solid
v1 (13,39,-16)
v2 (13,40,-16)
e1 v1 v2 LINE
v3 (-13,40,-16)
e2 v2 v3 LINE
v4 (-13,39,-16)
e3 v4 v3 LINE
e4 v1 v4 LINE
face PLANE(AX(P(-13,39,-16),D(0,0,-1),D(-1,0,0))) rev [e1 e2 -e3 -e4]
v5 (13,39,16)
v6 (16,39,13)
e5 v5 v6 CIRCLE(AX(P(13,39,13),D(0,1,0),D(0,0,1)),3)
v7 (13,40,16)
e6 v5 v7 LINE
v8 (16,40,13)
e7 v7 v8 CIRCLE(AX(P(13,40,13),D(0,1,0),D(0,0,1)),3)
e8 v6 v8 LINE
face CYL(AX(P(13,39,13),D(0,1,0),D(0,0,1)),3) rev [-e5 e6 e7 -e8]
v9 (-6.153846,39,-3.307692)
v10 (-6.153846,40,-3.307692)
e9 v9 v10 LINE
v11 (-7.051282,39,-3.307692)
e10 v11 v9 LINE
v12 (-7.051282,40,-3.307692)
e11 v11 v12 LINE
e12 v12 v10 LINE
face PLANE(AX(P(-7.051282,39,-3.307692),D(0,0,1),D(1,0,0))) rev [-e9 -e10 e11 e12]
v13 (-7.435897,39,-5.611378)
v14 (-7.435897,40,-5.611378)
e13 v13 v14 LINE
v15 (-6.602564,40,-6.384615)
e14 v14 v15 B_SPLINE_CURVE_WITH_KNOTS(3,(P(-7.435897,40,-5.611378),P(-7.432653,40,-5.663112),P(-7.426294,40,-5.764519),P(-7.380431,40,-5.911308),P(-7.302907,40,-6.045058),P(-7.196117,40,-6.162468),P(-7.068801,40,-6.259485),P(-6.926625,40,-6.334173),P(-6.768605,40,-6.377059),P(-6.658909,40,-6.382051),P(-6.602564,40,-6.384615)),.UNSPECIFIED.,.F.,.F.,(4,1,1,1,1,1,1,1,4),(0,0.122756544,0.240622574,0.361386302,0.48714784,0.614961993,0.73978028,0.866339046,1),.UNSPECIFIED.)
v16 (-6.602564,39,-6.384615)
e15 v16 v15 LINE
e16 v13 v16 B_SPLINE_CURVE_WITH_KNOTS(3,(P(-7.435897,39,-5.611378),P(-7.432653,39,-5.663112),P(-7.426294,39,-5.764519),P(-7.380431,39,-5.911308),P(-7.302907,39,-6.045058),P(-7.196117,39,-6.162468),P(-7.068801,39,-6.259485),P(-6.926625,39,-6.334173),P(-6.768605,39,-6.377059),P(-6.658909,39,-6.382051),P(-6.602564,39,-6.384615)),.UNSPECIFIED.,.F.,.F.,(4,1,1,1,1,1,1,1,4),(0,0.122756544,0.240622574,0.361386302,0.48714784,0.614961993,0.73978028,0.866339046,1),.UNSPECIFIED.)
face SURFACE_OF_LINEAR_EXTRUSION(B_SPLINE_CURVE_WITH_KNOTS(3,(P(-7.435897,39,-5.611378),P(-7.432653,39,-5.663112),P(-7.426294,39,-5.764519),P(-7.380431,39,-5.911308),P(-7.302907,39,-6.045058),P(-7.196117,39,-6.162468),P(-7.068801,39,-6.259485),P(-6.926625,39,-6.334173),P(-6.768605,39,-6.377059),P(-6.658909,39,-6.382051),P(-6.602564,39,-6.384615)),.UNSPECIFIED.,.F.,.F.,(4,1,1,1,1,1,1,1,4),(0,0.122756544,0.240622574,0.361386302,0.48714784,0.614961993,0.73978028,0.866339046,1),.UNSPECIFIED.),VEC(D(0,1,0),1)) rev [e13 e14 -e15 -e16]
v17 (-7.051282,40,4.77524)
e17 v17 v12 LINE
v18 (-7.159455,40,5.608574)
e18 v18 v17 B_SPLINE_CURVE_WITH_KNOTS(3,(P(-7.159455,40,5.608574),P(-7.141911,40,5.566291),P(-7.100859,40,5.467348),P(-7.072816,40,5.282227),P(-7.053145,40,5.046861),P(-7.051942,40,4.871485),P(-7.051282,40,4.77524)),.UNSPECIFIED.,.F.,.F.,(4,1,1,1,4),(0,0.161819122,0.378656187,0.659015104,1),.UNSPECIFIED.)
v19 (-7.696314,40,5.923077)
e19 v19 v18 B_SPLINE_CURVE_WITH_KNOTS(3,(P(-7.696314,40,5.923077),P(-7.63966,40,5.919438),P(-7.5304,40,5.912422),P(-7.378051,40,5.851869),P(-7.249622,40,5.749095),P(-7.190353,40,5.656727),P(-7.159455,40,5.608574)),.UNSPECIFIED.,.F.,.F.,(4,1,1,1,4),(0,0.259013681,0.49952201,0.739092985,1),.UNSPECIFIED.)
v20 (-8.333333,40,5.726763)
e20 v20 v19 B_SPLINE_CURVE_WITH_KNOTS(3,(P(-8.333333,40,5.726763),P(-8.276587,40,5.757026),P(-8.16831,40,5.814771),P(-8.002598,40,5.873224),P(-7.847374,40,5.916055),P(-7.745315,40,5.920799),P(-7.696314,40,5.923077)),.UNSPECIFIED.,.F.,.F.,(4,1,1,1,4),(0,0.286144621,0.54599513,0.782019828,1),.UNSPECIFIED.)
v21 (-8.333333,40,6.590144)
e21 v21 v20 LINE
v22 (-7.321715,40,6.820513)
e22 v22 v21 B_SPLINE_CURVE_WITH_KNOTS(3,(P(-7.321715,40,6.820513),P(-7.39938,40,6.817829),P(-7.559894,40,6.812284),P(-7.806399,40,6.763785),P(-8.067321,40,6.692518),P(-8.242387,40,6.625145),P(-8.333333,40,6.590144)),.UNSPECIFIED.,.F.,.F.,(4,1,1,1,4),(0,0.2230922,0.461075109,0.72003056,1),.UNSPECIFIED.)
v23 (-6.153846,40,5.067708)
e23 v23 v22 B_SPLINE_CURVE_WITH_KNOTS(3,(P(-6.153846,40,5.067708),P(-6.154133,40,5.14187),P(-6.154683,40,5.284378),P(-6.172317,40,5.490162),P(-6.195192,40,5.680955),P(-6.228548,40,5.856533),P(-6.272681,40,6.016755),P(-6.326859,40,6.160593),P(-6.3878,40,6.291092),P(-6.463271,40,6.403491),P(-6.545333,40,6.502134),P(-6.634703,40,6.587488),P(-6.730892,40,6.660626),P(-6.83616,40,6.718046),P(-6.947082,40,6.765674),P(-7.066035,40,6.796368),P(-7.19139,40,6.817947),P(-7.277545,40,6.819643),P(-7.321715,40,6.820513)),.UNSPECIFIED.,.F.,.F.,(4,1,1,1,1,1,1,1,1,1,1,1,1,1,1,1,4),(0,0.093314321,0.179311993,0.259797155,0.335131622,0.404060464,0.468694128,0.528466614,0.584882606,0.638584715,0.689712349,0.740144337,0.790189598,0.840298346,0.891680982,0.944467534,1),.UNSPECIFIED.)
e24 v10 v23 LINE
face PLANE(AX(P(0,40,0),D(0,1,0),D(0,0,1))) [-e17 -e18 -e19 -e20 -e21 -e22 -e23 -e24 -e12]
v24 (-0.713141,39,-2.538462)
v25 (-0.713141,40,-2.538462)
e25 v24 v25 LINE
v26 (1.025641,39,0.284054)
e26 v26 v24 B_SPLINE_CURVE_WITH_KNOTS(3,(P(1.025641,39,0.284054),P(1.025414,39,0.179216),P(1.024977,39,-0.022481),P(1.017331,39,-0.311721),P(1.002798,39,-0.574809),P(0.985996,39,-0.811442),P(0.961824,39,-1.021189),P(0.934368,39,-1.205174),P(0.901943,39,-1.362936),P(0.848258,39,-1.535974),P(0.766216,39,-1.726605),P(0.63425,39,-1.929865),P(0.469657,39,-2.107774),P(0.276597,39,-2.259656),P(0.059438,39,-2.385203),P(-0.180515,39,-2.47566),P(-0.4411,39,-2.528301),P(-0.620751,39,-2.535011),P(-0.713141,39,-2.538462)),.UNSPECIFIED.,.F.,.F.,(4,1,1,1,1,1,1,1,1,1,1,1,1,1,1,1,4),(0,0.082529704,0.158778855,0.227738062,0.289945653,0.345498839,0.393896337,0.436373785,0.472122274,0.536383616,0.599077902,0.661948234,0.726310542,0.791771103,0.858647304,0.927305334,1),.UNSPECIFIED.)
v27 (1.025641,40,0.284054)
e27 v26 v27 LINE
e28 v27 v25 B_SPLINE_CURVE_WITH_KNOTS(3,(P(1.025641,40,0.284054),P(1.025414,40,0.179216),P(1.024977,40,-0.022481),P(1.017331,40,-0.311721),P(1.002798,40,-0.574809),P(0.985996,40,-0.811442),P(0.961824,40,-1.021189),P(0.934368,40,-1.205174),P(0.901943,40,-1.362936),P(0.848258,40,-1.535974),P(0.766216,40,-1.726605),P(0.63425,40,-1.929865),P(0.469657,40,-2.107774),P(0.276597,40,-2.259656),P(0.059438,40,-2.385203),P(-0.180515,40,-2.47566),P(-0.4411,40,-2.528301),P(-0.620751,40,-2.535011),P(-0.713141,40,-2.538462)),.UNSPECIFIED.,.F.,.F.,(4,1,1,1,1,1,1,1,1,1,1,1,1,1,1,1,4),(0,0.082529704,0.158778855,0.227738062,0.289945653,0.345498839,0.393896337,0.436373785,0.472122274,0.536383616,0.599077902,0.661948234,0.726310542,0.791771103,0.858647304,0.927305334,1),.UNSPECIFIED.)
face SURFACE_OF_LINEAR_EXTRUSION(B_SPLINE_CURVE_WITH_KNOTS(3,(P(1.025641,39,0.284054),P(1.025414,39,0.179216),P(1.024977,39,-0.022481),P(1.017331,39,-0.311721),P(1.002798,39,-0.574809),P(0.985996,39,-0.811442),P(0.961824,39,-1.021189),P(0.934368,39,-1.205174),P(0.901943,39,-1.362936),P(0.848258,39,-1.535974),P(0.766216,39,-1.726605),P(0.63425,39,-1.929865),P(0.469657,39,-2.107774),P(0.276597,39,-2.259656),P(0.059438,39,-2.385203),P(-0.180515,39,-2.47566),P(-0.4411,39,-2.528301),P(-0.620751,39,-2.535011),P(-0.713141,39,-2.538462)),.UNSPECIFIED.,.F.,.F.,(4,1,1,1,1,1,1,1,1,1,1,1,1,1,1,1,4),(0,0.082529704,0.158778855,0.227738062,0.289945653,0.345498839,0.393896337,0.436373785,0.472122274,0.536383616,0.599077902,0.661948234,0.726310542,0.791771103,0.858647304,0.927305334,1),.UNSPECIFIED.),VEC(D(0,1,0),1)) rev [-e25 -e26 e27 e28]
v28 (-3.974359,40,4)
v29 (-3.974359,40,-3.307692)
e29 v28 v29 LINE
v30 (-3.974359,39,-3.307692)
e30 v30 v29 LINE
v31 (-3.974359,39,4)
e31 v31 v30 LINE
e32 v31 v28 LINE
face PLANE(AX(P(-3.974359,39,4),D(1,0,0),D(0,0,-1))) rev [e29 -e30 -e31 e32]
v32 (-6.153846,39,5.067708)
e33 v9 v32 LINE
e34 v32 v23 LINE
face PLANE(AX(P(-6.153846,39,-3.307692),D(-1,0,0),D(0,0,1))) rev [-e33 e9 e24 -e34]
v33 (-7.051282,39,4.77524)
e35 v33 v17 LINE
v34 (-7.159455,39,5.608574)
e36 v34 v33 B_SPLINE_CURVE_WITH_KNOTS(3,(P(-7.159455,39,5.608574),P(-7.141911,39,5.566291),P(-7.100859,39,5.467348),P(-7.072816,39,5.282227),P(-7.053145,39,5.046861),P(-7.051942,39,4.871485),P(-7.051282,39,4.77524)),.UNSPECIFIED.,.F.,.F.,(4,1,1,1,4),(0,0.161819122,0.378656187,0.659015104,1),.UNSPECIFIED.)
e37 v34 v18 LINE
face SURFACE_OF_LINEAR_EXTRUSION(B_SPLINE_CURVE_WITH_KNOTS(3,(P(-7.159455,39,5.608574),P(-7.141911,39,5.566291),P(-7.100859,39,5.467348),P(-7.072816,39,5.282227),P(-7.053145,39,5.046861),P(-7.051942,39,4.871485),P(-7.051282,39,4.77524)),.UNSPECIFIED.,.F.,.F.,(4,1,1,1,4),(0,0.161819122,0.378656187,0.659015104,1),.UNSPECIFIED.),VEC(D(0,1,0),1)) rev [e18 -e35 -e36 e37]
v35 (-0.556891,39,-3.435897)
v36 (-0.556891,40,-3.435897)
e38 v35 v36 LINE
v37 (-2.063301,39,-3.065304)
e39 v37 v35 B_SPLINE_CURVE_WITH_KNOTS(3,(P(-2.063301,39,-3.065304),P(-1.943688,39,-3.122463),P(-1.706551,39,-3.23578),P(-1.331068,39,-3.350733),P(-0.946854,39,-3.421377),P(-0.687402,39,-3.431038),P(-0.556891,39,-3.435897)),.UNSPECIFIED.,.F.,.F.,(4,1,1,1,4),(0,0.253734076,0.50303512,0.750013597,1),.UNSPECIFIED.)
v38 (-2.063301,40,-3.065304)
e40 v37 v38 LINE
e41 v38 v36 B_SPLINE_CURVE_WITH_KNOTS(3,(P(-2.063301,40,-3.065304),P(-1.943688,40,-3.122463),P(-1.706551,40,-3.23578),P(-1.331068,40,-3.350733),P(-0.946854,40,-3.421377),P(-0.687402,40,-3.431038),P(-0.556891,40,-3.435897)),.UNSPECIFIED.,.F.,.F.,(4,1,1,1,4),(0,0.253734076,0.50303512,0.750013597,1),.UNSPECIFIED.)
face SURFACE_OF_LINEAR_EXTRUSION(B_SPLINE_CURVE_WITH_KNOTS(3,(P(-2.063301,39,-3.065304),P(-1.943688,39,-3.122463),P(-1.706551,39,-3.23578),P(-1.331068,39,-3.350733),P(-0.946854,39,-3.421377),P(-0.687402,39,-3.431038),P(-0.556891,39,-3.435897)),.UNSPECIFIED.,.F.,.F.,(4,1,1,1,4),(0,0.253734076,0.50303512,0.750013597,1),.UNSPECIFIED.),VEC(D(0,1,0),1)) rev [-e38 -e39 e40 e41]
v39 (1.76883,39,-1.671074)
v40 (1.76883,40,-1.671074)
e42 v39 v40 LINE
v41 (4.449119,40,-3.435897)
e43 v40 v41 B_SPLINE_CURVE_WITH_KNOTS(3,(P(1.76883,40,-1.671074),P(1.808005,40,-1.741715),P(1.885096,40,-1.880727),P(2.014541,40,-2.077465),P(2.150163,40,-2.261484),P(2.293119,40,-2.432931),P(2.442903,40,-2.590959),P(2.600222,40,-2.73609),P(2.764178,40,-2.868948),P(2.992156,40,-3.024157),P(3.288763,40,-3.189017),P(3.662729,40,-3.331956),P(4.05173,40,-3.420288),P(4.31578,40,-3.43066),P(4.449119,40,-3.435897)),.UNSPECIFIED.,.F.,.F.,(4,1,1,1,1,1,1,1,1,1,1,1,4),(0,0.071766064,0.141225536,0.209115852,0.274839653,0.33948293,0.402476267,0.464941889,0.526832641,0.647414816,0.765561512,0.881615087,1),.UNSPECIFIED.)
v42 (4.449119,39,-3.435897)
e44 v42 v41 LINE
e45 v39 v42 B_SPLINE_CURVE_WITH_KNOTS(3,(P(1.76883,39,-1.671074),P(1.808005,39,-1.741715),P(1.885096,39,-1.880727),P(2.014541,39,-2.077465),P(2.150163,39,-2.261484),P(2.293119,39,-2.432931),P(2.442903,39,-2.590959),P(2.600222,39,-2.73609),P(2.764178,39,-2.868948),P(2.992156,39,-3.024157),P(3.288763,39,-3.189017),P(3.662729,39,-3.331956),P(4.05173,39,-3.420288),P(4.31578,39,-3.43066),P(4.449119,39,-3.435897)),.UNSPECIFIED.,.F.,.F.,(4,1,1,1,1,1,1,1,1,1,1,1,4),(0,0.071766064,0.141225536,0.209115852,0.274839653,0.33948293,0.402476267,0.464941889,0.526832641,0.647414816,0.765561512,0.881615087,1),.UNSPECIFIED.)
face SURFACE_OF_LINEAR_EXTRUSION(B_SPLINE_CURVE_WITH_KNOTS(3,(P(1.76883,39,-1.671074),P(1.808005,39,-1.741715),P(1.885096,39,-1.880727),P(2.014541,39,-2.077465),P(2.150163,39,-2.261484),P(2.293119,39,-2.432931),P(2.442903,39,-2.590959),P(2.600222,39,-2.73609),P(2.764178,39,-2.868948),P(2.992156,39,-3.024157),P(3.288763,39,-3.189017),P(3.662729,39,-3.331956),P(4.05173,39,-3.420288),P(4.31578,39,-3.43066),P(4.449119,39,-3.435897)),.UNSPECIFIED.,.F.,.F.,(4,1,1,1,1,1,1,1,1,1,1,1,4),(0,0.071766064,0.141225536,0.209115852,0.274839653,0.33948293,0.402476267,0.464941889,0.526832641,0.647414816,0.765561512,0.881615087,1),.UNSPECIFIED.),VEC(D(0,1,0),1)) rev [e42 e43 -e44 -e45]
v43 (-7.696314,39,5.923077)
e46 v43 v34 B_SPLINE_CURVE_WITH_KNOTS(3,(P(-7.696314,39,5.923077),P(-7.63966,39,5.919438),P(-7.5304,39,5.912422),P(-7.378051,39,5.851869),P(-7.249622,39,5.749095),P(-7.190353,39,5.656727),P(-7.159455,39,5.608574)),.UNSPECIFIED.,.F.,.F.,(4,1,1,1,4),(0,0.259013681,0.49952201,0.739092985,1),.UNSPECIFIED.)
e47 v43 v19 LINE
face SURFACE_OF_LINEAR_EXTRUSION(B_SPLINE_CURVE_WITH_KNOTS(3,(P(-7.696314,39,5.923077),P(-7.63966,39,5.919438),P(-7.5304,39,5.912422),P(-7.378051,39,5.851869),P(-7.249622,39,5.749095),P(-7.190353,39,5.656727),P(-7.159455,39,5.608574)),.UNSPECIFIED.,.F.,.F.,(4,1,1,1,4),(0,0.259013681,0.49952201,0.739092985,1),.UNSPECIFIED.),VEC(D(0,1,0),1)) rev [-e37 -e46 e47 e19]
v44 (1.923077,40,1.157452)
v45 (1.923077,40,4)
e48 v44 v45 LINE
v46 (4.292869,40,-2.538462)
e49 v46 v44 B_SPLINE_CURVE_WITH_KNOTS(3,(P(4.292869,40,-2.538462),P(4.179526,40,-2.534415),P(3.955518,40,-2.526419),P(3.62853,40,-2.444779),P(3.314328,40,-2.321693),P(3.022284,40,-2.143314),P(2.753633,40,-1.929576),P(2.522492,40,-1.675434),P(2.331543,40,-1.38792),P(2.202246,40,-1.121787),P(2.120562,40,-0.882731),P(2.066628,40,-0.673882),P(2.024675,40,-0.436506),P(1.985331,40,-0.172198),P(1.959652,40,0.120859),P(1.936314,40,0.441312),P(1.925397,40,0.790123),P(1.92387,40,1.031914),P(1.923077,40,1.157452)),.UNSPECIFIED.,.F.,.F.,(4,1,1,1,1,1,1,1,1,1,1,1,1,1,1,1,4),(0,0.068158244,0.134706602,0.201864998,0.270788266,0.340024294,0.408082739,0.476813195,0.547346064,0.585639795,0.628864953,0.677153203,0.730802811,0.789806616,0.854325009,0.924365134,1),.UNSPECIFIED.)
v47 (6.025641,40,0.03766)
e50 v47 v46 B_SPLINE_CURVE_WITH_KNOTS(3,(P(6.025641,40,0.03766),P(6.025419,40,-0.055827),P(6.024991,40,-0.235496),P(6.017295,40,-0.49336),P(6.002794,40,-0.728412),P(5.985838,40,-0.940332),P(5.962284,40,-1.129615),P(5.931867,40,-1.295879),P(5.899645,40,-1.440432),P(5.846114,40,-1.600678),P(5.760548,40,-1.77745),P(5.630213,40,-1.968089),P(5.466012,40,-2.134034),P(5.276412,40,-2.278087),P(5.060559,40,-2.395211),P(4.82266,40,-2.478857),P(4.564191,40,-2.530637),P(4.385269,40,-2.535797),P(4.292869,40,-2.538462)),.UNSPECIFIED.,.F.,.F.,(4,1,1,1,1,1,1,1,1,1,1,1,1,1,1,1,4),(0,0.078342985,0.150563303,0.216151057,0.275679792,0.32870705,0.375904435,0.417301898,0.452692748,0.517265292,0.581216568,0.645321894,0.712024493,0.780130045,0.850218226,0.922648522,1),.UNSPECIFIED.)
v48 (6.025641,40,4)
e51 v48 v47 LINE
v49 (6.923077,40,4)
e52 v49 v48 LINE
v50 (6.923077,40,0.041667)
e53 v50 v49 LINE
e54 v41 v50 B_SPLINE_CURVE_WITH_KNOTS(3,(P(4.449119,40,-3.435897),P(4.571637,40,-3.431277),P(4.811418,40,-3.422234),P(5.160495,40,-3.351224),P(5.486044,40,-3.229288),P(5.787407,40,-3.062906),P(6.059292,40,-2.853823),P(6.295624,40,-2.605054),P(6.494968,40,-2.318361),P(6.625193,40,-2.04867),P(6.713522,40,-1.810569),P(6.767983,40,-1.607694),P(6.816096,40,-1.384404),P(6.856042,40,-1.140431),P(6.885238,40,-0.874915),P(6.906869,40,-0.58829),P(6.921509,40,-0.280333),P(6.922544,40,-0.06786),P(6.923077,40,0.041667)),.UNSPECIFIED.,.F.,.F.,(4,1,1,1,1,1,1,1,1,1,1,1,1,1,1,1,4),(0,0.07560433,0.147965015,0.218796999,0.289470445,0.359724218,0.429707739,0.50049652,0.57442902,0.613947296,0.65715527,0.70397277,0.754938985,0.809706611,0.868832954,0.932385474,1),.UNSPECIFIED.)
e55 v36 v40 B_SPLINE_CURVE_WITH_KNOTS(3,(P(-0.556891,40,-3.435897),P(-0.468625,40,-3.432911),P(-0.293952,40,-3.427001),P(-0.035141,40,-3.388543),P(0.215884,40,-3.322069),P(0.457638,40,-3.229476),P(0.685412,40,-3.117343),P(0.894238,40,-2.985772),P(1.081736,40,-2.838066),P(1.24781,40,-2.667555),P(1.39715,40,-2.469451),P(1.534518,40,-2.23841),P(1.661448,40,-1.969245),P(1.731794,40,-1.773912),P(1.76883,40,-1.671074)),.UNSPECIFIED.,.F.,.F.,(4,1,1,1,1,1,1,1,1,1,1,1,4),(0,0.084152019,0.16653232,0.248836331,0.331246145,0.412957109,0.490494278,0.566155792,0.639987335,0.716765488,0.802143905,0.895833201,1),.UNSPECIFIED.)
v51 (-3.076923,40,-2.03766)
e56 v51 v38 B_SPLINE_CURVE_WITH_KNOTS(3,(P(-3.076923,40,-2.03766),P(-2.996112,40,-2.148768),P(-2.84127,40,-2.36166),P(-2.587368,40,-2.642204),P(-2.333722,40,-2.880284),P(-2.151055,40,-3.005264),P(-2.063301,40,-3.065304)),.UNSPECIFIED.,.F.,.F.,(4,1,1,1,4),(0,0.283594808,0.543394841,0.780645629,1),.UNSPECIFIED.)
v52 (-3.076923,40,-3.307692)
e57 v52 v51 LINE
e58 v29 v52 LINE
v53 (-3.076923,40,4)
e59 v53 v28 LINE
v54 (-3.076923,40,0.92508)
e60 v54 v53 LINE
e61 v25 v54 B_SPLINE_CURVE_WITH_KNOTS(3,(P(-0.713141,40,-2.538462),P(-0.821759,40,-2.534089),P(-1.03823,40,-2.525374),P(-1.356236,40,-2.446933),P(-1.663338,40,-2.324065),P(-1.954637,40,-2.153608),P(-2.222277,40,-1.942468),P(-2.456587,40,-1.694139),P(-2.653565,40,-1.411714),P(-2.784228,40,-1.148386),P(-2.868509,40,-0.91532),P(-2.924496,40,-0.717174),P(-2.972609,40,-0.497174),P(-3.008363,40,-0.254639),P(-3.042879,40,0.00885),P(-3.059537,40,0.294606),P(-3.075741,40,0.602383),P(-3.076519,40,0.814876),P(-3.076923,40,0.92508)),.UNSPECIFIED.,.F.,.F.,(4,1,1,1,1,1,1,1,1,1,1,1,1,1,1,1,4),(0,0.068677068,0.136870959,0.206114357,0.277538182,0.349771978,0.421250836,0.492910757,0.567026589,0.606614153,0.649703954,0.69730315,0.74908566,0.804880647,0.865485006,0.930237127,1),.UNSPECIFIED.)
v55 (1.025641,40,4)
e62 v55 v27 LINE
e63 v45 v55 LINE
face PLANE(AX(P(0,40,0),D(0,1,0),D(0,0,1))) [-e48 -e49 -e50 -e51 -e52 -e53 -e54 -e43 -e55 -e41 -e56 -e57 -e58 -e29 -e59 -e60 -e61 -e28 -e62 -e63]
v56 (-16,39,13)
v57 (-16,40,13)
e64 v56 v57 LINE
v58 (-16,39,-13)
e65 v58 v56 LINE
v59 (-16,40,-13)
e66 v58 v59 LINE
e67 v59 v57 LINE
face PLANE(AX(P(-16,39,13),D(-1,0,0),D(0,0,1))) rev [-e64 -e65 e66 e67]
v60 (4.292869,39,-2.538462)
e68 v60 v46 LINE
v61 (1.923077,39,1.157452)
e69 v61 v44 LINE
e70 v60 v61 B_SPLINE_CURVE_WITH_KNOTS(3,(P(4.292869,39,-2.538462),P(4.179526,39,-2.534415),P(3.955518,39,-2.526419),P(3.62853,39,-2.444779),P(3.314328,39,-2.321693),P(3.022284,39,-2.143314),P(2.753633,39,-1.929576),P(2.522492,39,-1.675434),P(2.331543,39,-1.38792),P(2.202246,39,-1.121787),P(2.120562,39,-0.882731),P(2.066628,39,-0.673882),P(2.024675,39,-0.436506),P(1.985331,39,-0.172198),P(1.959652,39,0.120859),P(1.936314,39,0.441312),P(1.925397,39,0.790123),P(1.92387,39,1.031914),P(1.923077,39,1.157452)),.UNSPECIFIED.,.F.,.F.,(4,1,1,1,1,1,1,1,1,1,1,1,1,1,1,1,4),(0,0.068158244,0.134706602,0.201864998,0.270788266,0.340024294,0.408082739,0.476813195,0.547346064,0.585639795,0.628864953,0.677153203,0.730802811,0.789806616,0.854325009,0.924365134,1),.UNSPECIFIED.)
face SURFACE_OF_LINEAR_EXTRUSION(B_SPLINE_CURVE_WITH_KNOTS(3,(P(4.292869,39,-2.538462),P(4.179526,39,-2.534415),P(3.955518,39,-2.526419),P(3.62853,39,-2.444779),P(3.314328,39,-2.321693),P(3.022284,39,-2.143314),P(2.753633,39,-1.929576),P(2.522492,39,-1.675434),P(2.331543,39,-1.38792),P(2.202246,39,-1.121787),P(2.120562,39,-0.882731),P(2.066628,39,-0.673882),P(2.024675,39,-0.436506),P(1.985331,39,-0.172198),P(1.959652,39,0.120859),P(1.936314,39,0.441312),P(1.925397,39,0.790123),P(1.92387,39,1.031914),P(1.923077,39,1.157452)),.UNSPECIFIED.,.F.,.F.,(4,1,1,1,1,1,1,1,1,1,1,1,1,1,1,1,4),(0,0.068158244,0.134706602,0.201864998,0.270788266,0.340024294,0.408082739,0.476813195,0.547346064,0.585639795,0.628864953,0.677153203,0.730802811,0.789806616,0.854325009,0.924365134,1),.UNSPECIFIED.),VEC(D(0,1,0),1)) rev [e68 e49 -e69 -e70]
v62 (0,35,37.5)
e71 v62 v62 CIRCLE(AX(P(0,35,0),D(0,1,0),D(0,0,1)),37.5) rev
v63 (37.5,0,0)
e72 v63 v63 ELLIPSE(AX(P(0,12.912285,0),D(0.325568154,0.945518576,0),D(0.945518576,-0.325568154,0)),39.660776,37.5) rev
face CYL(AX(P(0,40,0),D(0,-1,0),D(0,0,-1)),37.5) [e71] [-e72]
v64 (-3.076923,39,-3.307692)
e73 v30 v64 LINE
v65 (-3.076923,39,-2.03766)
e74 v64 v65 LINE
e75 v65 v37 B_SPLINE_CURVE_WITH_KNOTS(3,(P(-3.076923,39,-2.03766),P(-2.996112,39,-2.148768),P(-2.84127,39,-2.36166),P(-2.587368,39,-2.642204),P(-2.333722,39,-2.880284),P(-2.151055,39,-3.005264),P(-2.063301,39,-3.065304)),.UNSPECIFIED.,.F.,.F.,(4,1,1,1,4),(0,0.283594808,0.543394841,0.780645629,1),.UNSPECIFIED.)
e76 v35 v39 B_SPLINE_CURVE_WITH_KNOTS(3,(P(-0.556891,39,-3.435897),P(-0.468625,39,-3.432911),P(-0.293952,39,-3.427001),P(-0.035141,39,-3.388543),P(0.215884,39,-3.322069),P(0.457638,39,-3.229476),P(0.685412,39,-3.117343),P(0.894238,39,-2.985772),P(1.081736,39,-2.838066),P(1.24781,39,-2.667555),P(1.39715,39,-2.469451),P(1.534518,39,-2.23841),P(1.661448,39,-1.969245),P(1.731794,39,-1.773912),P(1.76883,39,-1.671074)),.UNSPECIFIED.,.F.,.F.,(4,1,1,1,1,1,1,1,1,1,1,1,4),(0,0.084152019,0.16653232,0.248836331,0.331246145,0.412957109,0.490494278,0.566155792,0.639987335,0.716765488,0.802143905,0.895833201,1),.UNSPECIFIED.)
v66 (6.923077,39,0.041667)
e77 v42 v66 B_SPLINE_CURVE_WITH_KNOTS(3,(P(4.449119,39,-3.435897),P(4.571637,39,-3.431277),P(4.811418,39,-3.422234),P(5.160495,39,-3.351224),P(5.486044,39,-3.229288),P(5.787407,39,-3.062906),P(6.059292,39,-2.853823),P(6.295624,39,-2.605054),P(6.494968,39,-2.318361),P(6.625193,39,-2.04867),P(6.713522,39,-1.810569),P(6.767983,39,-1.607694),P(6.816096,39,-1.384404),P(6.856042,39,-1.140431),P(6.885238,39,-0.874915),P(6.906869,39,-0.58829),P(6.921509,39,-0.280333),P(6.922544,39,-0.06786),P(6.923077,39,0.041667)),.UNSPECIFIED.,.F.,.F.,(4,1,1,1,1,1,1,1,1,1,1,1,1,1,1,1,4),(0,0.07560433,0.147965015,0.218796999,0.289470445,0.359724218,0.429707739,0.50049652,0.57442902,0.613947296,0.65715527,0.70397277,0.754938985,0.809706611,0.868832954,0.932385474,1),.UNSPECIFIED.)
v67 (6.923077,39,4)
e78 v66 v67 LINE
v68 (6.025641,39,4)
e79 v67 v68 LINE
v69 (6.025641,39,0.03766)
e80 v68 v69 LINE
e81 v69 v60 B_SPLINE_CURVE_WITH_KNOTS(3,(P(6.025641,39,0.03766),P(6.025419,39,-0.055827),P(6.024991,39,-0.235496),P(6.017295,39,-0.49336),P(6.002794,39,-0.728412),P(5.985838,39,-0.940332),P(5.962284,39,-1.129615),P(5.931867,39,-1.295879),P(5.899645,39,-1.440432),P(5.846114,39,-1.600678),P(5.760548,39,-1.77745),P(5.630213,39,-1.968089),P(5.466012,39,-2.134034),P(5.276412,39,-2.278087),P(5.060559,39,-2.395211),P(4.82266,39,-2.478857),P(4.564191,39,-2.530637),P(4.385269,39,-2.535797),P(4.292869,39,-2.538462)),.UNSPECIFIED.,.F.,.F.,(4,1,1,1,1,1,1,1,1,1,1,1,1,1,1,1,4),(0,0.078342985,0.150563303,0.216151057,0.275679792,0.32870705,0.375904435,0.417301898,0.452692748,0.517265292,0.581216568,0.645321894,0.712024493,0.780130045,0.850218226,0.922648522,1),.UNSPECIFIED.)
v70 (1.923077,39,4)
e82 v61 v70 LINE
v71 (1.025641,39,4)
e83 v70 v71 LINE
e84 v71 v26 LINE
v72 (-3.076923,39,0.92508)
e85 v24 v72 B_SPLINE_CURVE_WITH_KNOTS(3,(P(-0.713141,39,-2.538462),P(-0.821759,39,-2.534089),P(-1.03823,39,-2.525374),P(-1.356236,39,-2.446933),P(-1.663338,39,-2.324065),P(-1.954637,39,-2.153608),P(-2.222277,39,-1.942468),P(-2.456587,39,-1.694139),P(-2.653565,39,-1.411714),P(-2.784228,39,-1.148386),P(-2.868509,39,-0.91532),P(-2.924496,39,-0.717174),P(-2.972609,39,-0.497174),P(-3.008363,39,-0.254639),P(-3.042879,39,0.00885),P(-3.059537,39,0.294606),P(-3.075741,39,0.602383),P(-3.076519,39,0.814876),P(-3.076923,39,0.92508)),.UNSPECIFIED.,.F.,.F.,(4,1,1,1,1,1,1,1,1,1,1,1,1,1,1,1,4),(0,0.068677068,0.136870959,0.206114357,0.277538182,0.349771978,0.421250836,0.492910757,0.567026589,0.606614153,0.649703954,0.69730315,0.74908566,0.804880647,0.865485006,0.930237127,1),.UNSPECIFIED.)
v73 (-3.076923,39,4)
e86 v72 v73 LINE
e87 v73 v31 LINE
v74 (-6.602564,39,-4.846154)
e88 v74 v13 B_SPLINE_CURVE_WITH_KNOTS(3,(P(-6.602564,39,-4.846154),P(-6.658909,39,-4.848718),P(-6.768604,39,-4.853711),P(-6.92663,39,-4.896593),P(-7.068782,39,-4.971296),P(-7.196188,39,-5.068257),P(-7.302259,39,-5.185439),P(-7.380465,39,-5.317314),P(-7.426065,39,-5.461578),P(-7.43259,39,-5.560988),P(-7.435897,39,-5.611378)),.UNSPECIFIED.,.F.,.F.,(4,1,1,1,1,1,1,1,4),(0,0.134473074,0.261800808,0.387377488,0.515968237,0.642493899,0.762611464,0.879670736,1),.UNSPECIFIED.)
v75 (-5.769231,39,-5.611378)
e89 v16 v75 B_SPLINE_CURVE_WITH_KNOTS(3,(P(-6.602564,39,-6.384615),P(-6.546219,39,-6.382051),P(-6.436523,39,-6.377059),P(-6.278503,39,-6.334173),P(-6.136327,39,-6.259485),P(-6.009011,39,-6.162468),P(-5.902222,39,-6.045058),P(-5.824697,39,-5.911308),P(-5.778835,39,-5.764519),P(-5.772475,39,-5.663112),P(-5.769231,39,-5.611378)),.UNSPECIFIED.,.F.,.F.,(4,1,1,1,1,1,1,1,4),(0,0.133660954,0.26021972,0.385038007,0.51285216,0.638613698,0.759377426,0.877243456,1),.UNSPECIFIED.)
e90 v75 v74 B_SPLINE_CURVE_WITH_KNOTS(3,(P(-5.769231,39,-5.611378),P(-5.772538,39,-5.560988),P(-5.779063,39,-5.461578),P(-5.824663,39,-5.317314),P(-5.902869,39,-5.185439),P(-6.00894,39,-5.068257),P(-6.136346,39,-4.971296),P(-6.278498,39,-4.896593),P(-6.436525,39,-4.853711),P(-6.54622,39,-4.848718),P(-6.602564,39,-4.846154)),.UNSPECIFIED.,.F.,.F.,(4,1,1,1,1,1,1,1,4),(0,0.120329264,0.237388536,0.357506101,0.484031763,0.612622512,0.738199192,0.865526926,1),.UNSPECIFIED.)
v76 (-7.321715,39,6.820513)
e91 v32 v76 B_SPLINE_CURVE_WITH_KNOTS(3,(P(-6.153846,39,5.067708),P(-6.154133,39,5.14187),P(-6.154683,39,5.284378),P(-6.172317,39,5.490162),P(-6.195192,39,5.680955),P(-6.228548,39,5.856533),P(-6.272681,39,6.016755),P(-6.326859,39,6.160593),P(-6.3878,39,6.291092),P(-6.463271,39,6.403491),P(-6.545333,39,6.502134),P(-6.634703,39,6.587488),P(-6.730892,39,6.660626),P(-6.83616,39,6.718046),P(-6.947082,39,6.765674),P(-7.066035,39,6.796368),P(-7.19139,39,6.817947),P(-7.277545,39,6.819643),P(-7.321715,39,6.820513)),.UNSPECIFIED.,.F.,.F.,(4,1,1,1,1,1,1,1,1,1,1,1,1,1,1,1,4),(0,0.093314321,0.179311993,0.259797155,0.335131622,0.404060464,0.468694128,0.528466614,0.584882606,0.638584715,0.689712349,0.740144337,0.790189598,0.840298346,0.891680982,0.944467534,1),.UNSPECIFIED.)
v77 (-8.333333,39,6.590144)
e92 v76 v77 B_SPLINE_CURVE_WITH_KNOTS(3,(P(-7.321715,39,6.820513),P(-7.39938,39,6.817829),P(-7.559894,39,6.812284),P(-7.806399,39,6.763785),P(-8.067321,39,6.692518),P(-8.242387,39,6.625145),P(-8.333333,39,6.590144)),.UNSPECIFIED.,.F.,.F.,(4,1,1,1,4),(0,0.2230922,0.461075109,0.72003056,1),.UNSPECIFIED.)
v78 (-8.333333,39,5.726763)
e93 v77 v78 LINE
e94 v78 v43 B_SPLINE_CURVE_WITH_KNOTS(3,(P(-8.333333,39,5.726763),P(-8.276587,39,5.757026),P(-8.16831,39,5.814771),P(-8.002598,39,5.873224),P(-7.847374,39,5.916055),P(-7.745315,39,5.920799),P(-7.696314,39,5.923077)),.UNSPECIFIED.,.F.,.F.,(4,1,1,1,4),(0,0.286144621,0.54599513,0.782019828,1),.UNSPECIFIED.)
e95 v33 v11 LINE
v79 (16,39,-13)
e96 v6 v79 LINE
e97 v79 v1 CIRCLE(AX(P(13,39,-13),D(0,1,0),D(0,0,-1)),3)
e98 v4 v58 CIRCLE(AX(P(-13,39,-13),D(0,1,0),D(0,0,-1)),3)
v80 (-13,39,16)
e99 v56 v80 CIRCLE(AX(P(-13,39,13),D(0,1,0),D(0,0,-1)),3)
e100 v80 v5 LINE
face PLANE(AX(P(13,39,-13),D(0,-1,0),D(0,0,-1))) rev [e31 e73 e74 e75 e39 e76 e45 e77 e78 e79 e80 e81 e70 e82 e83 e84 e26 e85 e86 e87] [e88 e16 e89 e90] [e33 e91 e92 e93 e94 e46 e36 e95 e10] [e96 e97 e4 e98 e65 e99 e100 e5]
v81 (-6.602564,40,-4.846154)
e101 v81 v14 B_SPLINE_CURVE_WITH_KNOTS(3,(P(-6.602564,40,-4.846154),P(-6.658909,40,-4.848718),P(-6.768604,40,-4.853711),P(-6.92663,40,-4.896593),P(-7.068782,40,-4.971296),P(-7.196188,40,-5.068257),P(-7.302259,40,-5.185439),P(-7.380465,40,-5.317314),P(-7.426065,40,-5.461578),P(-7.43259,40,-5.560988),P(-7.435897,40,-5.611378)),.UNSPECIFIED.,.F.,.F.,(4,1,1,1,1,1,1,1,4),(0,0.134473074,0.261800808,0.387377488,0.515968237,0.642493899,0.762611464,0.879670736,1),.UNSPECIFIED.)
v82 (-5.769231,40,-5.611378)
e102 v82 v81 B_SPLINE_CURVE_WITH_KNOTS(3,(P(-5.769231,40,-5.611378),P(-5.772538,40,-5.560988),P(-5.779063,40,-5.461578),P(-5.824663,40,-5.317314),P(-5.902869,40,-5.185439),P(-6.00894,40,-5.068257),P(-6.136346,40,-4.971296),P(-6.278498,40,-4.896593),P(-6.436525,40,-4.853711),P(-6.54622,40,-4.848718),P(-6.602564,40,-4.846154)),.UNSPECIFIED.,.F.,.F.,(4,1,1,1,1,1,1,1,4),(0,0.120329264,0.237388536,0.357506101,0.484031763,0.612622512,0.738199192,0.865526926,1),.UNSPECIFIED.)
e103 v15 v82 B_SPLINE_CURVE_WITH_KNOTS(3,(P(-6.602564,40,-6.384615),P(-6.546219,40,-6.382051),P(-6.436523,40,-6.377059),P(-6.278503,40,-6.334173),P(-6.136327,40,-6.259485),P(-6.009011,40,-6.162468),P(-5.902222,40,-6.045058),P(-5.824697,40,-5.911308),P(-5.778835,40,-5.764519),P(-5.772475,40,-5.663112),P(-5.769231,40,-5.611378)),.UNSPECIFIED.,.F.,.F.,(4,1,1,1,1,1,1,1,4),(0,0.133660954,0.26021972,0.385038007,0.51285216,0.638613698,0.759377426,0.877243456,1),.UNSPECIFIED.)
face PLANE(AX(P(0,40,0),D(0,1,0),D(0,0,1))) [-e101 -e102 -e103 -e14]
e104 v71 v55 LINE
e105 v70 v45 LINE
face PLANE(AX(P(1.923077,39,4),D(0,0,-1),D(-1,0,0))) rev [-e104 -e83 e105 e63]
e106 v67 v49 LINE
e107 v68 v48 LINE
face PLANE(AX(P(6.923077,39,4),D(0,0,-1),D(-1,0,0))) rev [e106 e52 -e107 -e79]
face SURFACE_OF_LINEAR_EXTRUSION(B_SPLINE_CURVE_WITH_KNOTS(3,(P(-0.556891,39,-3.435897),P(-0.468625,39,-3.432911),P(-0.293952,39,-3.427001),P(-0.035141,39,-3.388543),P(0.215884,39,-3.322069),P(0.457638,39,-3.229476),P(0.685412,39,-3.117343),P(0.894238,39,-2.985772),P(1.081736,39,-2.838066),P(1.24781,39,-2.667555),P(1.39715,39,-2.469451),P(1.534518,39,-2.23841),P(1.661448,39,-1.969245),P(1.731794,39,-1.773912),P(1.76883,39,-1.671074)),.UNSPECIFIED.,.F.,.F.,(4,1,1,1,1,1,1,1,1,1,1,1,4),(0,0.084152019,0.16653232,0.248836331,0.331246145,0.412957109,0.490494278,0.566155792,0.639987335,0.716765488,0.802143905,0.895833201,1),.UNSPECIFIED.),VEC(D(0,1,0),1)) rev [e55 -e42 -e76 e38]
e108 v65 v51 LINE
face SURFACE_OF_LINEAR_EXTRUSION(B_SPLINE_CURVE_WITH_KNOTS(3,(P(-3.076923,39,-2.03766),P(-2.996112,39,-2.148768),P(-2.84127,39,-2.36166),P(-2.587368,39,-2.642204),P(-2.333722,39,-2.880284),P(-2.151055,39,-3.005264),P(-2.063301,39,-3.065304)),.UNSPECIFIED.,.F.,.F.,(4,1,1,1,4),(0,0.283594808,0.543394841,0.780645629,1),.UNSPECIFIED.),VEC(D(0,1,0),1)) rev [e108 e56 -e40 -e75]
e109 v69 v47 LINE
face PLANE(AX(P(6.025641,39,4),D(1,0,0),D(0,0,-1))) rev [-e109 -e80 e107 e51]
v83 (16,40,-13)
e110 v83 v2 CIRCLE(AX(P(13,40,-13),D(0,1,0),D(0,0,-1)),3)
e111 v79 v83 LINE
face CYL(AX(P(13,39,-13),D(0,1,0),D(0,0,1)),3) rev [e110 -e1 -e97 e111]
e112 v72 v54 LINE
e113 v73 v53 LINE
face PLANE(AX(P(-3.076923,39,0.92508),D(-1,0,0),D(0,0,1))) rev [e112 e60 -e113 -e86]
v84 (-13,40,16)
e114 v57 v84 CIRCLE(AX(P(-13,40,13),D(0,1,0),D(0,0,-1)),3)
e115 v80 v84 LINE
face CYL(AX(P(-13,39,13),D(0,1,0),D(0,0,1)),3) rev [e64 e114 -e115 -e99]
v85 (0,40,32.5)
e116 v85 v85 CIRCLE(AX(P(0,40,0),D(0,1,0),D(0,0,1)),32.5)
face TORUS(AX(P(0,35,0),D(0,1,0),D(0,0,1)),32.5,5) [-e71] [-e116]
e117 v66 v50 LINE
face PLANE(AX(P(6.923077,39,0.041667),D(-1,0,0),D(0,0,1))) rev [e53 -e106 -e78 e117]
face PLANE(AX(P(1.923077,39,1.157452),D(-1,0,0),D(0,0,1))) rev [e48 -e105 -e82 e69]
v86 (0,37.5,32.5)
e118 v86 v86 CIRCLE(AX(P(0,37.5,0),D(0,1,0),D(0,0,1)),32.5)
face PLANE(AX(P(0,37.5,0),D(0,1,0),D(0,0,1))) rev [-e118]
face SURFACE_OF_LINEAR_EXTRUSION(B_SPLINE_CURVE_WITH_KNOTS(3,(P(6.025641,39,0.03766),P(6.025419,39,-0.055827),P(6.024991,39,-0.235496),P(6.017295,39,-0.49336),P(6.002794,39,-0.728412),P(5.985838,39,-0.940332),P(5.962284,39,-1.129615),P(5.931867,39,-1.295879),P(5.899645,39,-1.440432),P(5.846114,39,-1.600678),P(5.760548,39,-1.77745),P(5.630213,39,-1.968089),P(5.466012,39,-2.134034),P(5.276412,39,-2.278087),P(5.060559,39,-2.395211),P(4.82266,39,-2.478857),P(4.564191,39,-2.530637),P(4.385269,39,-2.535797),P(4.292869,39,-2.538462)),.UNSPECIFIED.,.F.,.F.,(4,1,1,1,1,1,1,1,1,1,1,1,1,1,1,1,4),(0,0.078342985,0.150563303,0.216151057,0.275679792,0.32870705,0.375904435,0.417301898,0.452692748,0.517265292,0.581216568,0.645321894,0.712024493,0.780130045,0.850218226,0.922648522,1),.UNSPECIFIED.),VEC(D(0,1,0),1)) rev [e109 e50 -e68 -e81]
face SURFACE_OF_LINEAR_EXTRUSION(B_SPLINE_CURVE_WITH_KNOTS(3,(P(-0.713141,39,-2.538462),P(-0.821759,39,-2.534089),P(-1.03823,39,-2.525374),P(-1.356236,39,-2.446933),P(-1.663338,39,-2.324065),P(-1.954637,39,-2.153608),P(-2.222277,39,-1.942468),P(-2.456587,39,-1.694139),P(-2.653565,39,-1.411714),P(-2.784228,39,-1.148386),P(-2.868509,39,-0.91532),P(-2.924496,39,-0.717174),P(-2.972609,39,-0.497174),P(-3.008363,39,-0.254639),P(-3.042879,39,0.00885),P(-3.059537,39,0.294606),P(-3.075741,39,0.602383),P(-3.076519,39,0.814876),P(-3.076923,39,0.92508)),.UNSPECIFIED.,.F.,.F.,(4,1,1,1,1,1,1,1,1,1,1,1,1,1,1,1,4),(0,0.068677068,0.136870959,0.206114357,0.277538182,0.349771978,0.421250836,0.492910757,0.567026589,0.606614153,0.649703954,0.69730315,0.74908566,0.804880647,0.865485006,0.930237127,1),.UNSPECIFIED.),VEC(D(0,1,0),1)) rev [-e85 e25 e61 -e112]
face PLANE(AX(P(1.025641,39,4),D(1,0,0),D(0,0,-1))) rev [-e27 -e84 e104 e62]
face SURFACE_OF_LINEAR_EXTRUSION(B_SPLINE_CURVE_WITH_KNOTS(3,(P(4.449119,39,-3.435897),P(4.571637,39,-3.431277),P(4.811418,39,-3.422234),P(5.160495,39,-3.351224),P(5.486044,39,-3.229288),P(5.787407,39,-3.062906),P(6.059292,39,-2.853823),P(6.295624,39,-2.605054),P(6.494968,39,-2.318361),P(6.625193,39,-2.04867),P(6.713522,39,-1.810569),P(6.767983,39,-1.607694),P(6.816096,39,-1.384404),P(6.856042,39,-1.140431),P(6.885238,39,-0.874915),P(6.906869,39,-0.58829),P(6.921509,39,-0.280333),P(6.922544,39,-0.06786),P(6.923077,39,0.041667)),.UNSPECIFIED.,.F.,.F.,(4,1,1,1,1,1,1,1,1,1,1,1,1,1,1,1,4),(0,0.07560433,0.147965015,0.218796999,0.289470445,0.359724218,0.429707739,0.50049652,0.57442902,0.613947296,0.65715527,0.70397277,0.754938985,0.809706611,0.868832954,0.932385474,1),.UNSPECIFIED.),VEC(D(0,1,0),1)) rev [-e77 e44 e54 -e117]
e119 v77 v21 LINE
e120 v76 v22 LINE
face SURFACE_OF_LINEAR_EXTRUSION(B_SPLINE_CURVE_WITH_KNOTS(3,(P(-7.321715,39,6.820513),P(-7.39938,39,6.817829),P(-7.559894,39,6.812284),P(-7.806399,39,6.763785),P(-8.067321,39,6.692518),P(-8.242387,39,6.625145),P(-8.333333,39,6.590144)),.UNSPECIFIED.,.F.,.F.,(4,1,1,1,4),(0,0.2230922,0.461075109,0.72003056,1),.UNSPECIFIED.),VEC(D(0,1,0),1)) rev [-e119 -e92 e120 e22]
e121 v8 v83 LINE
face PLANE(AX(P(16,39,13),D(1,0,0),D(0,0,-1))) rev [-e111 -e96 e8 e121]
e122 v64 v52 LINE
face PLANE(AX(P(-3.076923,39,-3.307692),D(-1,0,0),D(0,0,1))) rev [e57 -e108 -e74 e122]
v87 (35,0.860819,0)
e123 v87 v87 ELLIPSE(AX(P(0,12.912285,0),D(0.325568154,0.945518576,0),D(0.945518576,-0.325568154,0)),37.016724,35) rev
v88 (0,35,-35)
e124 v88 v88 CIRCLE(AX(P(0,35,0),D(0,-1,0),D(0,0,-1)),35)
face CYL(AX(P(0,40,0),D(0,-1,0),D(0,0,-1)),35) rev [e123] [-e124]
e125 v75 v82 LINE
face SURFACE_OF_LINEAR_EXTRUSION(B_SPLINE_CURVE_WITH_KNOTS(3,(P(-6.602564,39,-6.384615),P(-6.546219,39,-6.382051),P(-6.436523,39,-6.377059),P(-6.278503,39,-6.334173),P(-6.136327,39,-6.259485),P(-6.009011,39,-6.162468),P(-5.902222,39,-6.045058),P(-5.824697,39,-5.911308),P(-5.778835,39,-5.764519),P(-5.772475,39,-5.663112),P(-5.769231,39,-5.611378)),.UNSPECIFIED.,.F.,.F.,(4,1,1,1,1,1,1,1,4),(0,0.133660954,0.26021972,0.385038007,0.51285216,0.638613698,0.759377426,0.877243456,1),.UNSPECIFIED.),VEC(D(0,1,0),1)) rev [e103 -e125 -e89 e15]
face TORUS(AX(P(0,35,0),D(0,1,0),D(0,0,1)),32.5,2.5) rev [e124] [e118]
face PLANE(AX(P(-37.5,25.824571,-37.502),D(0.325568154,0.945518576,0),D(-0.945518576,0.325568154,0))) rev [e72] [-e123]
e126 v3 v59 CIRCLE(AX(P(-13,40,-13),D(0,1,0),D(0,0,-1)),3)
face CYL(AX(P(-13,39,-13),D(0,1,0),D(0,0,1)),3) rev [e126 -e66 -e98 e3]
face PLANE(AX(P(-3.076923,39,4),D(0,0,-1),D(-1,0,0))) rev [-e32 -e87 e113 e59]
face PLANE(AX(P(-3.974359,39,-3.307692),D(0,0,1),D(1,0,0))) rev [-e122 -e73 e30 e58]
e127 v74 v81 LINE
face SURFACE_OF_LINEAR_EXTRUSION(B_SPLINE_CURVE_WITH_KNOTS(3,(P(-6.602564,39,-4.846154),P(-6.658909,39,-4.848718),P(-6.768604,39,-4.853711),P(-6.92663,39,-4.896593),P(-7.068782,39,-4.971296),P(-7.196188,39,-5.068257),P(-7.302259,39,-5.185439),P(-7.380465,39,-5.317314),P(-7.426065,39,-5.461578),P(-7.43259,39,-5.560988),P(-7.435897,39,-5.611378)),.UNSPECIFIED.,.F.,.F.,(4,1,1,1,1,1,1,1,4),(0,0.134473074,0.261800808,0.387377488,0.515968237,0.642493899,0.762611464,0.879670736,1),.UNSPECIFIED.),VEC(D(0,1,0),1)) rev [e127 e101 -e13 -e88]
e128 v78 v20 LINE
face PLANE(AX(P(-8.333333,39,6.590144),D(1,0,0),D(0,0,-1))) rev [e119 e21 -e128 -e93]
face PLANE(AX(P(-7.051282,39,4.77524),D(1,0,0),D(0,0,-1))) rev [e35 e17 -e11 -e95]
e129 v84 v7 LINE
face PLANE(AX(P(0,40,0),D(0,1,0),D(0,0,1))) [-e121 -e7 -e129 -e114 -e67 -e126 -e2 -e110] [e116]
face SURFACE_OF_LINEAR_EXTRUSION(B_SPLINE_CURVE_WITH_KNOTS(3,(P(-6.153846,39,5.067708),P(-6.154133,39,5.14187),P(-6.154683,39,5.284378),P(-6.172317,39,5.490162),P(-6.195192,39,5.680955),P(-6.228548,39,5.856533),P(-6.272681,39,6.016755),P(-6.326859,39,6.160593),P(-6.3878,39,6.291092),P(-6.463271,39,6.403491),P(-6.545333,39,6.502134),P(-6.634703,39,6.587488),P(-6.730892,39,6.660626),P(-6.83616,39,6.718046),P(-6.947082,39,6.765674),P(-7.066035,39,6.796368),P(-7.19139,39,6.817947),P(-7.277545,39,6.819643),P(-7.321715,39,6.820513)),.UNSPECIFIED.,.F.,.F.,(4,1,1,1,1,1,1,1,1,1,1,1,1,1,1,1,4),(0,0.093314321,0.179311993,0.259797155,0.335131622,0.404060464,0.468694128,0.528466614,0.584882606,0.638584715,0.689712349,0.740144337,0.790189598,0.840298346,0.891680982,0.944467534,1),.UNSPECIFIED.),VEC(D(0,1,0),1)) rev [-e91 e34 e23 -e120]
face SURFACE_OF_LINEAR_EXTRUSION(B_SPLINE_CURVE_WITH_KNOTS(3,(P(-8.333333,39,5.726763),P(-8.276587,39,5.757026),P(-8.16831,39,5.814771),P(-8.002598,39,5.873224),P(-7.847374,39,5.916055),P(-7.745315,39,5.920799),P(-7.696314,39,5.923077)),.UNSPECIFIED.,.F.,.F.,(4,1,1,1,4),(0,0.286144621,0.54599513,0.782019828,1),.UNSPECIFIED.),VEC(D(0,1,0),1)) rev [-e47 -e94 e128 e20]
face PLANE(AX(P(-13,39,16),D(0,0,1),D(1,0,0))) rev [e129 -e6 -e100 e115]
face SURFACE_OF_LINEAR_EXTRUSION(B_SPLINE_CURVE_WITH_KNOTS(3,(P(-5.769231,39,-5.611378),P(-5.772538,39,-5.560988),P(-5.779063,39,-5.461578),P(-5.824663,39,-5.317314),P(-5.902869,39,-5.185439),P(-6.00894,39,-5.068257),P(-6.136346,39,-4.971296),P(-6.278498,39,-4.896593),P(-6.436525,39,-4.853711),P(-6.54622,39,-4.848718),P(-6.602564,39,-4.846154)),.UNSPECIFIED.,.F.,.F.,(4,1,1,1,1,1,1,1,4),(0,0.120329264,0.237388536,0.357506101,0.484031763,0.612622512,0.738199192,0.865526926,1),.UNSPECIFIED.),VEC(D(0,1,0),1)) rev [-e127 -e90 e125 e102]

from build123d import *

# Parameters (mm, degrees)
SKETCH1_R                      = 37.5
BOSS_EXTRUDE1_DEPTH            = 40
CUT_EXTRUDE1_REACH             = 68.427
CUT_EXTRUDE1_DIRECTION_2_REACH = 68.427
FILLET1_R                      = 5
CUT_EXTRUDE2_DEPTH             = 1


# Read off the part's stored shape, not the designer's step: Shell1
with BuildPart() as part:
    # Sketch1 → Boss-Extrude1 (new body)
    with BuildSketch(Plane(origin=(0, 0, 0), x_dir=(1, 0, 0), z_dir=(0, 1, 0))):
        with Locations(Location((0, 0, 0), (0, 0, 270))):
            Circle(SKETCH1_R)
    extrude(amount=BOSS_EXTRUDE1_DEPTH)

    # Sketch2 → Cut-Extrude1 (cut, up to next)
    with BuildSketch(Plane.XY, mode=Mode.PRIVATE) as cut_extrude1_sk1:
        Polygon((37.5, 0), (-37.5, 0), (-37.5, 25.824570997), align=None)
    cut_extrude1_tool1 = extrude(cut_extrude1_sk1.sketch, amount=-CUT_EXTRUDE1_REACH, mode=Mode.PRIVATE) & part.part
    add(cut_extrude1_tool1.solids().sort_by_distance((-12.5, 8.60819, 0))[0], mode=Mode.SUBTRACT)

    # Sketch2 → Cut-Extrude1 direction 2 (cut, up to next)
    with BuildSketch(Plane.XY, mode=Mode.PRIVATE) as cut_extrude1_direction_2_sk1:
        Polygon((37.5, 0), (-37.5, 0), (-37.5, 25.824570997), align=None)
    cut_extrude1_direction_2_tool1 = extrude(cut_extrude1_direction_2_sk1.sketch, amount=CUT_EXTRUDE1_DIRECTION_2_REACH, mode=Mode.PRIVATE) & part.part
    add(cut_extrude1_direction_2_tool1.solids().sort_by_distance((-12.5, 8.60819, 0))[0], mode=Mode.SUBTRACT)

    # Fillet1
    fillet1_edges = [part.edges().sort_by_distance(p)[0] for p in [
        (0, 40, -37.5),
    ]]
    fillet(fillet1_edges, radius=FILLET1_R)

    # Shell1 outline → Shell1 (revolve, cut)
    with BuildSketch(Plane.XY):
        with BuildLine():
            Line((35, 0.854583606), (35, 35))
            ThreePointArc((35, 35), (34.267766953, 36.767766953), (32.5, 37.5))
            Line((32.5, 37.5), (0, 37.5))
            Line((0, 37.5), (0, 0.854583606))
            Line((0, 0.854583606), (35, 0.854583606))
        make_face()
    revolve(axis=Axis((0, 0, 0), (0, 1, 0)), mode=Mode.SUBTRACT)

    # Sketch3 → Cut-Extrude2 (cut)
    with BuildSketch(Plane(origin=(0, 40, 0), x_dir=(1, 0, 0), z_dir=(0, 1, 0))):
        with BuildLine():
            Line((-13, -16), (13, -16))
            ThreePointArc((13, -16), (15.121320344, -15.121320344), (16, -13))
            Line((16, -13), (16, 13))
            ThreePointArc((16, 13), (15.121320344, 15.121320344), (13, 16))
            Line((13, 16), (-13, 16))
            ThreePointArc((-13, 16), (-15.121320344, 15.121320344), (-16, 13))
            Line((-16, 13), (-16, -13))
            ThreePointArc((-16, -13), (-15.121320344, -15.121320344), (-13, -16))
        make_face()
        with BuildLine():
            add(Edge.make_bspline(
                [(-6.602564103, 6.384615385), (-6.546219207, 6.382051156), (-6.436523351, 6.377058951), (-6.278503166, 6.334172743), (-6.136327345, 6.259484797), (-6.009011428, 6.162468173), (-5.90222163, 6.045057839), (-5.824697029, 5.911307595), (-5.778834699, 5.764519327), (-5.772475164, 5.663112259), (-5.769230769, 5.611378205)],
                knots=[0, 0, 0, 0, 1.06928763, 2.081757757, 3.080304056, 4.102817284, 5.108909582, 6.075019406, 7.017947647, 8, 8, 8, 8], degree=3))
            add(Edge.make_bspline(
                [(-5.769230769, 5.611378205), (-5.772538286, 5.56098822), (-5.779063437, 5.461577616), (-5.824662885, 5.317314259), (-5.902869178, 5.185439169), (-6.008939934, 5.068256987), (-6.136346112, 4.971296003), (-6.278498143, 4.896593392), (-6.436524697, 4.85371111), (-6.546219664, 4.848718356), (-6.602564103, 4.846153846)],
                knots=[0, 0, 0, 0, 0.962634111, 1.899108286, 2.860048811, 3.872254101, 4.900980094, 5.905593535, 6.924215405, 8, 8, 8, 8], degree=3))
            add(Edge.make_bspline(
                [(-6.602564103, 4.846153846), (-6.658908541, 4.848718356), (-6.768603508, 4.85371111), (-6.926630062, 4.896593392), (-7.068782093, 4.971296003), (-7.196188271, 5.068256987), (-7.302259027, 5.185439169), (-7.38046532, 5.317314259), (-7.426064769, 5.461577616), (-7.432589919, 5.56098822), (-7.435897436, 5.611378205)],
                knots=[0, 0, 0, 0, 1.075784595, 2.094406465, 3.099019906, 4.127745899, 5.139951189, 6.100891714, 7.037365889, 8, 8, 8, 8], degree=3))
            add(Edge.make_bspline(
                [(-7.435897436, 5.611378205), (-7.432653041, 5.663112259), (-7.426293506, 5.764519327), (-7.380431176, 5.911307595), (-7.302906576, 6.045057839), (-7.196116777, 6.162468173), (-7.068800861, 6.259484797), (-6.926625039, 6.334172743), (-6.768604854, 6.377058951), (-6.658908998, 6.382051156), (-6.602564103, 6.384615385)],
                knots=[0, 0, 0, 0, 0.982052353, 1.924980594, 2.891090418, 3.897182716, 4.919695944, 5.918242243, 6.93071237, 8, 8, 8, 8], degree=3))
        make_face(mode=Mode.SUBTRACT)
        with BuildLine():
            Line((-7.051282051, 3.307692308), (-6.153846154, 3.307692308))
            Line((-6.153846154, 3.307692308), (-6.153846154, -5.067708333))
            add(Edge.make_bspline(
                [(-6.153846154, -5.067708333), (-6.154132606, -5.141869875), (-6.15468305, -5.284378053), (-6.172317042, -5.49016243), (-6.195192124, -5.680954673), (-6.228547736, -5.856533408), (-6.272681208, -6.016754586), (-6.326858883, -6.160593298), (-6.387799564, -6.291092499), (-6.463270778, -6.403491101), (-6.545332797, -6.502134381), (-6.634703123, -6.587487965), (-6.7308923, -6.660626224), (-6.836160171, -6.7180461), (-6.947081727, -6.765673789), (-7.066034551, -6.796368416), (-7.191389698, -6.817947311), (-7.277545042, -6.819643319), (-7.321714744, -6.820512821)],
                knots=[0, 0, 0, 0, 1.493029139, 2.868991889, 4.156754484, 5.362105958, 6.464967428, 7.499106053, 8.455465818, 9.358121702, 10.217355437, 11.035397588, 11.842309395, 12.643033568, 13.444773531, 14.266895717, 15.11148054, 16, 16, 16, 16], degree=3))
            add(Edge.make_bspline(
                [(-7.321714744, -6.820512821), (-7.399379833, -6.817829424), (-7.559893914, -6.812283524), (-7.806399323, -6.763785397), (-8.067320709, -6.692518214), (-8.242387038, -6.625144579), (-8.333333333, -6.590144231)],
                knots=[0, 0, 0, 0, 0.892368802, 1.844300437, 2.88012224, 4, 4, 4, 4], degree=3))
            Line((-8.333333333, -6.590144231), (-8.333333333, -5.726762821))
            add(Edge.make_bspline(
                [(-8.333333333, -5.726762821), (-8.276587466, -5.757025769), (-8.168310166, -5.814770775), (-8.002598459, -5.873223953), (-7.847373694, -5.916054943), (-7.745315187, -5.920799116), (-7.696314103, -5.923076923)],
                knots=[0, 0, 0, 0, 1.144578483, 2.183980519, 3.128079311, 4, 4, 4, 4], degree=3))
            add(Edge.make_bspline(
                [(-7.696314103, -5.923076923), (-7.639660339, -5.919438476), (-7.530400465, -5.912421532), (-7.378051109, -5.85186899), (-7.24962178, -5.749094843), (-7.190352916, -5.656726685), (-7.159455128, -5.608573718)],
                knots=[0, 0, 0, 0, 1.036054724, 1.998088038, 2.956371939, 4, 4, 4, 4], degree=3))
            add(Edge.make_bspline(
                [(-7.159455128, -5.608573718), (-7.141911229, -5.566290667), (-7.100858564, -5.467348473), (-7.072816103, -5.28222691), (-7.053144834, -5.04686094), (-7.051942097, -4.871484533), (-7.051282051, -4.775240385)],
                knots=[0, 0, 0, 0, 0.647276487, 1.514624746, 2.636060416, 4, 4, 4, 4], degree=3))
            Line((-7.051282051, -4.775240385), (-7.051282051, 3.307692308))
        make_face(mode=Mode.SUBTRACT)
        with BuildLine():
            Line((-3.974358974, 3.307692308), (-3.076923077, 3.307692308))
            Line((-3.076923077, 3.307692308), (-3.076923077, 2.037660256))
            add(Edge.make_bspline(
                [(-3.076923077, 2.037660256), (-2.996111791, 2.14876769), (-2.841269621, 2.361660184), (-2.587367757, 2.642203854), (-2.333721721, 2.880284296), (-2.151054916, 3.005263929), (-2.063301282, 3.065304487)],
                knots=[0, 0, 0, 0, 1.134379233, 2.173579362, 3.122582517, 4, 4, 4, 4], degree=3))
            add(Edge.make_bspline(
                [(-2.063301282, 3.065304487), (-1.943687962, 3.122462674), (-1.706551105, 3.235780426), (-1.331067605, 3.350733452), (-0.946854264, 3.421376598), (-0.687402224, 3.431037665), (-0.556891026, 3.435897436)],
                knots=[0, 0, 0, 0, 1.014936303, 2.012140481, 3.000054389, 4, 4, 4, 4], degree=3))
            add(Edge.make_bspline(
                [(-0.556891026, 3.435897436), (-0.468625321, 3.432910891), (-0.293952238, 3.427000679), (-0.035140552, 3.388543435), (0.215884053, 3.322068655), (0.457638423, 3.229476301), (0.685411792, 3.11734291), (0.894238071, 2.985772316), (1.081735809, 2.838066386), (1.247810241, 2.667555149), (1.397150314, 2.469450582), (1.534518447, 2.238409871), (1.661447625, 1.969245125), (1.731794222, 1.773912151), (1.768830128, 1.671073718)],
                knots=[0, 0, 0, 0, 1.009824226, 1.998387844, 2.986035974, 3.974953746, 4.955485308, 5.885931332, 6.793869504, 7.679848016, 8.601185859, 9.625726857, 10.749998409, 12, 12, 12, 12], degree=3))
            add(Edge.make_bspline(
                [(1.768830128, 1.671073718), (1.808005132, 1.741714916), (1.885096038, 1.880726873), (2.014540715, 2.077464765), (2.150162991, 2.26148417), (2.293118686, 2.432931097), (2.442903219, 2.590958898), (2.600221506, 2.736090046), (2.764178024, 2.868947799), (2.992155853, 3.024156826), (3.288763302, 3.189017345), (3.662729344, 3.331955756), (4.051729835, 3.420287551), (4.315780401, 3.430659759), (4.44911859, 3.435897436)],
                knots=[0, 0, 0, 0, 0.86119277, 1.694706429, 2.50939023, 3.298075842, 4.073795165, 4.829715201, 5.57930267, 6.321991688, 7.768977793, 9.186738141, 10.579381044, 12, 12, 12, 12], degree=3))
            add(Edge.make_bspline(
                [(4.44911859, 3.435897436), (4.571637055, 3.431276805), (4.811417587, 3.422233781), (5.160495489, 3.351223858), (5.486043504, 3.229287723), (5.787406579, 3.062905904), (6.05929176, 2.853822523), (6.295624072, 2.605054416), (6.494967967, 2.318361207), (6.625192652, 2.048669811), (6.713521979, 1.81056886), (6.767982648, 1.607693742), (6.816096063, 1.384403591), (6.856042478, 1.140431415), (6.885238341, 0.874915391), (6.906868956, 0.588290032), (6.921509167, 0.28033257), (6.922543659, 0.067859712), (6.923076923, -0.041666667)],
                knots=[0, 0, 0, 0, 1.209669288, 2.367440248, 3.500751976, 4.631527125, 5.755587489, 6.87532382, 8.007944318, 9.190864318, 9.82315674, 10.514484317, 11.263564316, 12.079023757, 12.955305781, 13.901327259, 14.918167583, 16, 16, 16, 16], degree=3))
            Line((6.923076923, -0.041666667), (6.923076923, -4))
            Line((6.923076923, -4), (6.025641026, -4))
            Line((6.025641026, -4), (6.025641026, -0.037660256))
            add(Edge.make_bspline(
                [(6.025641026, -0.037660256), (6.025418503, 0.055827098), (6.024990848, 0.235495574), (6.017294758, 0.493359721), (6.00279386, 0.72841217), (5.98583775, 0.940332422), (5.962284009, 1.129614675), (5.931867061, 1.295878728), (5.899645118, 1.440432474), (5.846113715, 1.600678325), (5.76054831, 1.777450355), (5.630212653, 1.968089143), (5.46601235, 2.134034286), (5.276411902, 2.27808662), (5.060559203, 2.395211309), (4.822659994, 2.478857051), (4.564191275, 2.530636703), (4.385269023, 2.535796748), (4.29286859, 2.538461538)],
                knots=[0, 0, 0, 0, 1.253487763, 2.409012846, 3.458416907, 4.410876679, 5.259312806, 6.014470957, 6.676830364, 7.243083969, 8.276244668, 9.299465089, 10.325150304, 11.392391894, 12.482080715, 13.603491619, 14.762376348, 16, 16, 16, 16], degree=3))
            add(Edge.make_bspline(
                [(4.29286859, 2.538461538), (4.179525863, 2.534415374), (3.955517545, 2.526418616), (3.628530442, 2.444778979), (3.314327537, 2.321692549), (3.0222843, 2.1433141), (2.75363347, 1.929575917), (2.522491819, 1.675434215), (2.331542717, 1.387920138), (2.202245643, 1.121786703), (2.120561925, 0.882731149), (2.06662788, 0.673881515), (2.024675333, 0.436505607), (1.985330964, 0.17219849), (1.959651741, -0.120859168), (1.936313535, -0.441311742), (1.925396784, -0.790123055), (1.923869759, -1.031913594), (1.923076923, -1.157451923)],
                knots=[0, 0, 0, 0, 1.090531906, 2.155305635, 3.229839962, 4.33261226, 5.44038871, 6.529323825, 7.629011124, 8.757537029, 9.370236727, 10.061839251, 10.834451254, 11.692844982, 12.636905849, 13.66920014, 14.789842145, 16, 16, 16, 16], degree=3))
            Line((1.923076923, -1.157451923), (1.923076923, -4))
            Line((1.923076923, -4), (1.025641026, -4))
            Line((1.025641026, -4), (1.025641026, -0.284054487))
            add(Edge.make_bspline(
                [(1.025641026, -0.284054487), (1.02541408, -0.179216434), (1.024977459, 0.022481444), (1.017330838, 0.311720516), (1.002797634, 0.574809317), (0.985996067, 0.81144207), (0.961824128, 1.021188724), (0.934367665, 1.205173747), (0.901943064, 1.362935893), (0.848257679, 1.535974135), (0.766216341, 1.726605344), (0.634249878, 1.929865404), (0.469656791, 2.107774254), (0.276597146, 2.259656393), (0.059438054, 2.385203482), (-0.18051452, 2.475659916), (-0.441099985, 2.528300743), (-0.620750573, 2.535010734), (-0.713141026, 2.538461538)],
                knots=[0, 0, 0, 0, 1.320475261, 2.540461679, 3.643808994, 4.639130445, 5.527981419, 6.302341397, 6.981980563, 7.553956391, 8.582137848, 9.585246428, 10.591171744, 11.620968678, 12.668337649, 13.738356861, 14.836885341, 16, 16, 16, 16], degree=3))
            add(Edge.make_bspline(
                [(-0.713141026, 2.538461538), (-0.821758773, 2.534088796), (-1.038230085, 2.525374074), (-1.356235713, 2.446933292), (-1.663337666, 2.324064507), (-1.954636805, 2.153607881), (-2.222277229, 1.942467656), (-2.456586564, 1.694139383), (-2.653565209, 1.411713573), (-2.784227537, 1.148386383), (-2.868508892, 0.915319883), (-2.924495562, 0.717174318), (-2.972608779, 0.497173609), (-3.008363126, 0.254639006), (-3.0428786, -0.008849835), (-3.059536626, -0.29460552), (-3.075741089, -0.602382913), (-3.076519417, -0.8148759), (-3.076923077, -0.925080128)],
                knots=[0, 0, 0, 0, 1.098833095, 2.189935336, 3.297829714, 4.440610912, 5.596351641, 6.740013378, 7.886572111, 9.072425424, 9.705826452, 10.395263256, 11.156850408, 11.985370555, 12.878090359, 13.847760091, 14.883794034, 16, 16, 16, 16], degree=3))
            Line((-3.076923077, -0.925080128), (-3.076923077, -4))
            Line((-3.076923077, -4), (-3.974358974, -4))
            Line((-3.974358974, -4), (-3.974358974, 3.307692308))
        make_face(mode=Mode.SUBTRACT)
    extrude(amount=-CUT_EXTRUDE2_DEPTH, mode=Mode.SUBTRACT)


solid = part.part
